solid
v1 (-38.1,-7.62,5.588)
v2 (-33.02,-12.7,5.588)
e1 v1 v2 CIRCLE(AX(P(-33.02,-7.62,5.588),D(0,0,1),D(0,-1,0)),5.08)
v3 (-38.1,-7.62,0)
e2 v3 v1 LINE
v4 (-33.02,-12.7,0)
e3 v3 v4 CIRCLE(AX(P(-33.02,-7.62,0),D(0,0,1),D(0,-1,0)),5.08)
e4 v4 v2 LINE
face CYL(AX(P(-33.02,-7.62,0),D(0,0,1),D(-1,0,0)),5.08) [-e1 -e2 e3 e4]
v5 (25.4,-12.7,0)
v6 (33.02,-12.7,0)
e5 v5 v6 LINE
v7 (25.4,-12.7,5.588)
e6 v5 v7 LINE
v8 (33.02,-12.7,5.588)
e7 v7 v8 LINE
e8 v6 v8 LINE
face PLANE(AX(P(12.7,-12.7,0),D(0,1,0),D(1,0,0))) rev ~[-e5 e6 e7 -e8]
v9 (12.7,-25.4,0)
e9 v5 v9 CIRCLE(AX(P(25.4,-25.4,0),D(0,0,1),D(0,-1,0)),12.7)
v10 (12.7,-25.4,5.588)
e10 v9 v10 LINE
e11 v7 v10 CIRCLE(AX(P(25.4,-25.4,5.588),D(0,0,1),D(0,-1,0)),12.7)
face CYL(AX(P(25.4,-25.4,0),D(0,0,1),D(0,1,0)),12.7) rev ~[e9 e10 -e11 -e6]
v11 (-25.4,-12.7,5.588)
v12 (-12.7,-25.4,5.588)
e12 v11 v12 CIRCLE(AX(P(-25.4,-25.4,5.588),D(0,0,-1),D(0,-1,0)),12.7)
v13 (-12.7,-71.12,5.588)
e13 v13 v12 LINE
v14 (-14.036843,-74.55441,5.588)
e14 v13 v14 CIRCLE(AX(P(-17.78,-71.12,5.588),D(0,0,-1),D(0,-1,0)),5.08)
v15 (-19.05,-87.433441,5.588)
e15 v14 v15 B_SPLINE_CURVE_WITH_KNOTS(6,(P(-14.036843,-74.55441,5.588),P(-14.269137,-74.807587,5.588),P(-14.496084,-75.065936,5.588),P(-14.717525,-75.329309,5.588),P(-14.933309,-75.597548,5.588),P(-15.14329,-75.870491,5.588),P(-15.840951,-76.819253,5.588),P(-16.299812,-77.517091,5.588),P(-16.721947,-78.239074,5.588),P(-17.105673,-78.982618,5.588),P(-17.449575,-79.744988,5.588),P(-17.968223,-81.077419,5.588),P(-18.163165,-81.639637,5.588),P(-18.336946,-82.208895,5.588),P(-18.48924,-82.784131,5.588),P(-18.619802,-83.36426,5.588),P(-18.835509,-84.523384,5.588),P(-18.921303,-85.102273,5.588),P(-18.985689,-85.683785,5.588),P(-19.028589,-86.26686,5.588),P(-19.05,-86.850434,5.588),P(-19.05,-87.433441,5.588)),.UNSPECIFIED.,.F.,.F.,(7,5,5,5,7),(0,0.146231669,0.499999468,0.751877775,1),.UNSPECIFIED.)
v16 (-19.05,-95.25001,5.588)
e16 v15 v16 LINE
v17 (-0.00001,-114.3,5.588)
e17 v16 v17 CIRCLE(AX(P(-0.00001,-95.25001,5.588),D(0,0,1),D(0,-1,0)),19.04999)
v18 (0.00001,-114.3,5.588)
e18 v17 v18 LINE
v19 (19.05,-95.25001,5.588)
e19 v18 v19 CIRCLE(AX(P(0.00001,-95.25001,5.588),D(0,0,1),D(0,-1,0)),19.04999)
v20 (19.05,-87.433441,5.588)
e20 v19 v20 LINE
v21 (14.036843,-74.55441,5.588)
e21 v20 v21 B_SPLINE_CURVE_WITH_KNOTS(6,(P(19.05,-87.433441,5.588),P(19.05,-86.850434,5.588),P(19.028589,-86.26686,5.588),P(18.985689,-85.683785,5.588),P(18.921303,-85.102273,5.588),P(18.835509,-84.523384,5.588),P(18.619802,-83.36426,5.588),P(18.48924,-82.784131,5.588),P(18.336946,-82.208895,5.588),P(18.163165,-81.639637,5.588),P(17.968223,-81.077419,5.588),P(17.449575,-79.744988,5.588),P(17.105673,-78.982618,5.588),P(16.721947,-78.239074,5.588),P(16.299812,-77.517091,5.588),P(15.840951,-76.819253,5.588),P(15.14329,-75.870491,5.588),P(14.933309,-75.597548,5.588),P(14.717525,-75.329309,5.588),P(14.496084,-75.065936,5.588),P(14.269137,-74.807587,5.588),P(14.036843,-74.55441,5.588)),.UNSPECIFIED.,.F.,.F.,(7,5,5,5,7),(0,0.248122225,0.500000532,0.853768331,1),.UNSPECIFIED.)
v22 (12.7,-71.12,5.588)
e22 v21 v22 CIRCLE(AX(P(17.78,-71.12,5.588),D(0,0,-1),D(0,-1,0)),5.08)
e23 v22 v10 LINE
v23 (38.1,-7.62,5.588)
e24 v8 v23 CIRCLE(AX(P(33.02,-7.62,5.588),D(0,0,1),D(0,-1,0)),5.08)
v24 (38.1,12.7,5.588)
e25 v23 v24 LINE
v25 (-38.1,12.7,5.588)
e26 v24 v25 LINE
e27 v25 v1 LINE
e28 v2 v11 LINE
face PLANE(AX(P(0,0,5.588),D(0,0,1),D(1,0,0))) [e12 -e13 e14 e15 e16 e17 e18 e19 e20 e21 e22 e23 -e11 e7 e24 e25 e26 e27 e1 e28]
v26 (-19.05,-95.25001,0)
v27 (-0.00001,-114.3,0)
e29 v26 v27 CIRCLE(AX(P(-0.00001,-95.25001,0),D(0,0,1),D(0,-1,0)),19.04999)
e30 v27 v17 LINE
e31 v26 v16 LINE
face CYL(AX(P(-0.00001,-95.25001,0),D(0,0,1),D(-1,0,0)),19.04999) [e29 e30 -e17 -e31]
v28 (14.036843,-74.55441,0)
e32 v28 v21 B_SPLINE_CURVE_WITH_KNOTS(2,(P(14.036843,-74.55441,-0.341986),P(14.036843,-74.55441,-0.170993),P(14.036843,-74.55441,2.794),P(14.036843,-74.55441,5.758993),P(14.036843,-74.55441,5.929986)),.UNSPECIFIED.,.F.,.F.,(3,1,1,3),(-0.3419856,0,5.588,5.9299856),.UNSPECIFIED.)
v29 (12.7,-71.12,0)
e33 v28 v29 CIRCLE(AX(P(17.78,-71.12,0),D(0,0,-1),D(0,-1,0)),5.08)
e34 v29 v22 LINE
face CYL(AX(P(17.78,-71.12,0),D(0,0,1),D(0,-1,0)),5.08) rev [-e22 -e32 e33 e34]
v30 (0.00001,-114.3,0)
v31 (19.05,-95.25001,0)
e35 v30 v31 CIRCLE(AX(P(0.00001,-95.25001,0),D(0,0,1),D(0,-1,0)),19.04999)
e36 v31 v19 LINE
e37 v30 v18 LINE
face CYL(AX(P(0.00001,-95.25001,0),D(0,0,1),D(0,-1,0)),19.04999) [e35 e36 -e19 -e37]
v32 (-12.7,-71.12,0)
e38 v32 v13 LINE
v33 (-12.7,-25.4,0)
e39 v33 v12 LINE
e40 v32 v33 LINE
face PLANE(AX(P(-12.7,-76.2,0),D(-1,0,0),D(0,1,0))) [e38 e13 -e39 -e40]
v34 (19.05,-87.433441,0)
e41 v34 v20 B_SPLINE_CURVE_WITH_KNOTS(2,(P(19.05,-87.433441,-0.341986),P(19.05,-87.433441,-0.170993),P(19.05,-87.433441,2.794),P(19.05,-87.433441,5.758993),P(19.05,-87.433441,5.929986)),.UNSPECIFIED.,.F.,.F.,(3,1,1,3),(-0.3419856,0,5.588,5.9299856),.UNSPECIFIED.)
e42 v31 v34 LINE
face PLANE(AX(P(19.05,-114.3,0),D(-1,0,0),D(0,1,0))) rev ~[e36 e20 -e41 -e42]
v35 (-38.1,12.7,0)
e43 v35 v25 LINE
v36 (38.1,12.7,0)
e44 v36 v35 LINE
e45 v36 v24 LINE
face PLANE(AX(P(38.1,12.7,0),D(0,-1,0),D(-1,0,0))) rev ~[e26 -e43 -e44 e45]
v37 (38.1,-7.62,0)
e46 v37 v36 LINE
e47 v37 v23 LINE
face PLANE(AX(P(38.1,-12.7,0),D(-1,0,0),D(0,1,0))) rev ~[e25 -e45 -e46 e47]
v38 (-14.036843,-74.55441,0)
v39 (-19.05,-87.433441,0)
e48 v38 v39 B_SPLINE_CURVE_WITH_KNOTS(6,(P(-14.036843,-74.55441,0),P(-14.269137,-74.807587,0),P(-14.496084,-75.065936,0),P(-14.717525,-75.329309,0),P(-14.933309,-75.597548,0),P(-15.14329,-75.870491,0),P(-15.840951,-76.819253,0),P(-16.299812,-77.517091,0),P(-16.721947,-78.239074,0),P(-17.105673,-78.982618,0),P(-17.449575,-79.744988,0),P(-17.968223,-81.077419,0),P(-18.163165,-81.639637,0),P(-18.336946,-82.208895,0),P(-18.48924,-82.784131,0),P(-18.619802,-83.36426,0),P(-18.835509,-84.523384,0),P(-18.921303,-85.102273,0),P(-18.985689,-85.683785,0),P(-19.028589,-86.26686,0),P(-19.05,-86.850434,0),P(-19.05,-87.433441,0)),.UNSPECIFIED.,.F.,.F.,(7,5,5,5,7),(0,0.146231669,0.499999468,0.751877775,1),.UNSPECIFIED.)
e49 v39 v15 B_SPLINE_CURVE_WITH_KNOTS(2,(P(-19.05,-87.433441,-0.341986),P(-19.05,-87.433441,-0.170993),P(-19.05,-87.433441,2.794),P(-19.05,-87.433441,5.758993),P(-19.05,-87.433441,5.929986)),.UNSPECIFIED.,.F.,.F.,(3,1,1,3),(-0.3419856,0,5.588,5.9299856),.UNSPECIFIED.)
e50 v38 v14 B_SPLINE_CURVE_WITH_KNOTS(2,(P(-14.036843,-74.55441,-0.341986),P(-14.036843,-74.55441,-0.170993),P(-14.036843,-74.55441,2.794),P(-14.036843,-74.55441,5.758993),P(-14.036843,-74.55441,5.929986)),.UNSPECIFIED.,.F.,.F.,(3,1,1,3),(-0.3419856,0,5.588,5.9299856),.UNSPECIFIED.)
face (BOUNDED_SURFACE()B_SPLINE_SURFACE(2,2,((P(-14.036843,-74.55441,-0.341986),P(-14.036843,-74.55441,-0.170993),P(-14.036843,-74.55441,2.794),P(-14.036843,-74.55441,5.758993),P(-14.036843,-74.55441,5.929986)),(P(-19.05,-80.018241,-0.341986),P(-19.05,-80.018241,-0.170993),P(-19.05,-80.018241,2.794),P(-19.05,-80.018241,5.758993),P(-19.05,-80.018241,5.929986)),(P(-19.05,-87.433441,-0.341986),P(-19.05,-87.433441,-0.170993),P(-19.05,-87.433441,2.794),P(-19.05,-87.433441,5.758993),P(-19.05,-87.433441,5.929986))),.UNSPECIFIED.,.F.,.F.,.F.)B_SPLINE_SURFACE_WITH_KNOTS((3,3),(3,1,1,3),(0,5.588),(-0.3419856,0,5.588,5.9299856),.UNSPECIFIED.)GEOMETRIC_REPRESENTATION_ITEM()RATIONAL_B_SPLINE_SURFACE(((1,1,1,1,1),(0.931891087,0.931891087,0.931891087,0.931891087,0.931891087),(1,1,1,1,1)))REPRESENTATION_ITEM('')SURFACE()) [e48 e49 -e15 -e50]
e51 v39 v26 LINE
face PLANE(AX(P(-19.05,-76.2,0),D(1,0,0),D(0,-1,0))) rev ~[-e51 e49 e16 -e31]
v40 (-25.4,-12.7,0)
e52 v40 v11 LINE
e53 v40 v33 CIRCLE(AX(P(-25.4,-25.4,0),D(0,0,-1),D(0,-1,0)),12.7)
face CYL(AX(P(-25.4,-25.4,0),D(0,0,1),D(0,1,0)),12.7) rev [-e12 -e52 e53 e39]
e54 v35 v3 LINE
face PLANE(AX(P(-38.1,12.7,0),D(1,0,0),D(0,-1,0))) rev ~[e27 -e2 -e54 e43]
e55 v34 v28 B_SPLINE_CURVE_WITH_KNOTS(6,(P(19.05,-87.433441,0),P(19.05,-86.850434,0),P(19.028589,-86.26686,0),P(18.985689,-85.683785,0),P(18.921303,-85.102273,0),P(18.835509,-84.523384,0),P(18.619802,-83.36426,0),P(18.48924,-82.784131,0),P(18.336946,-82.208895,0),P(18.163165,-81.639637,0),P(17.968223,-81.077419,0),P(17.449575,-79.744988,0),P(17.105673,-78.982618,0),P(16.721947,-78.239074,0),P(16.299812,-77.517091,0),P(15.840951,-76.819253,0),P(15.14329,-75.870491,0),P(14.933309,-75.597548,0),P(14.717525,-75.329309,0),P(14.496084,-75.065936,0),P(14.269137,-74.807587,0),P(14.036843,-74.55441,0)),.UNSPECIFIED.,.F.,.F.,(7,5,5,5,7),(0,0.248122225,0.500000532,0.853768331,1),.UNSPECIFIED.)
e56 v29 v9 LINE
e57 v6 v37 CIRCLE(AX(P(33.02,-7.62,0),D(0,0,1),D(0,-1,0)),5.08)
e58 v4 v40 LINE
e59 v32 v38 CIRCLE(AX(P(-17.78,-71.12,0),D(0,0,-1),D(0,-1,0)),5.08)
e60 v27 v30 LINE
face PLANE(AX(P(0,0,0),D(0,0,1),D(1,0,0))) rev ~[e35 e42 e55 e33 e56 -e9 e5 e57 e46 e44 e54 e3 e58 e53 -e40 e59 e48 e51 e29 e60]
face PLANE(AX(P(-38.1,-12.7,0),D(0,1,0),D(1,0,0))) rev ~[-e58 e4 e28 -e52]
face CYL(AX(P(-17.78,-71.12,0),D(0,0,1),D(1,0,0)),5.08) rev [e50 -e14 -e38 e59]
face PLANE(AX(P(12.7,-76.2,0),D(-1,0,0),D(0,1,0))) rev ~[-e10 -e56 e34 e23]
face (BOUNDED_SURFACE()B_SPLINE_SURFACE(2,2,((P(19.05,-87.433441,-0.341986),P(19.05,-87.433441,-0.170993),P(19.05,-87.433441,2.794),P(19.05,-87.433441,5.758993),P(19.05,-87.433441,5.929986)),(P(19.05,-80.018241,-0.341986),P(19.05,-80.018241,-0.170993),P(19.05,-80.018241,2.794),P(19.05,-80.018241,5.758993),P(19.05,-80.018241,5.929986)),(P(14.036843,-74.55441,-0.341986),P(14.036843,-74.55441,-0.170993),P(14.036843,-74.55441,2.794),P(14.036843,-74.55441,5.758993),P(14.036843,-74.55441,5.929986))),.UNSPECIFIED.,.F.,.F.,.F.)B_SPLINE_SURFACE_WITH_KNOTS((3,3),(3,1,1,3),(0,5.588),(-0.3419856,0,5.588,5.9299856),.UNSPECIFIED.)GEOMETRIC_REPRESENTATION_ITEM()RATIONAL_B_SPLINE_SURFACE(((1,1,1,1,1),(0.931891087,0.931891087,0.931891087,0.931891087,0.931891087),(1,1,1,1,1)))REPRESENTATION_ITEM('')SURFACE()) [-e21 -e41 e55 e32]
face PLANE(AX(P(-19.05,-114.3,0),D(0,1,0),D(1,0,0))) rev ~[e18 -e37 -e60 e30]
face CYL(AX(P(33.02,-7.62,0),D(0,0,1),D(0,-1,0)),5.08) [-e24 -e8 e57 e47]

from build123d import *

# Parameters (mm, degrees)
F0_W     = 25.4
F0_H     = 63.5
F1_DEPTH = 5.588
F2_R     = 5.08
F3_R     = 12.7
F4_R     = 5.08
F5_R     = 19.04999


# Not quite as in the source:
# - a fillet or chamfer is up to 0.001 mm smaller than in the source, because OpenCascade refuses the exact size


with BuildPart() as f1:
    # F0 (on Top) → F1 (new body)
    with BuildSketch(Plane.XY):
        Polygon((38.1, 12.7), (-38.1, 12.7), (-38.1, -12.7), (-12.7, -12.7), (12.7, -12.7), (38.1, -12.7), align=None)
        with Locations((0, -44.45)):
            Rectangle(F0_W, F0_H)
        Polygon((12.7, -76.2), (-12.7, -76.2), (-19.05, -76.2), (-19.05, -114.3), (19.05, -114.3), (19.05, -76.2), align=None)
    extrude(amount=F1_DEPTH)

    # F2
    f2_edges = [f1.edges().sort_by_distance(p)[0] for p in [
        (-38.1, -12.7, 2.794),
        (38.1, -12.7, 2.794),
    ]]
    fillet(f2_edges, radius=F2_R)

    # F3
    f3_edges = [f1.edges().sort_by_distance(p)[0] for p in [
        (-12.7, -12.7, 2.794),
        (12.7, -12.7, 2.794),
    ]]
    fillet(f3_edges, radius=F3_R)

    # F4
    f4_edges = [f1.edges().sort_by_distance(p)[0] for p in [
        (-12.7, -76.2, 2.794),
        (12.7, -76.2, 2.794),
    ]]
    fillet(f4_edges, radius=F4_R)

    # F5 (radius 19.05 in the source; OpenCascade refuses exactly that, so slightly less here)
    f5_edges = [f1.edges().sort_by_distance(p)[0] for p in [
        (-19.05, -114.3, 2.794),
        (-19.05, -76.2, 2.794),
        (19.05, -114.3, 2.794),
        (19.05, -76.2, 2.794),
    ]]
    fillet(f5_edges, radius=F5_R)


solid = f1.part
